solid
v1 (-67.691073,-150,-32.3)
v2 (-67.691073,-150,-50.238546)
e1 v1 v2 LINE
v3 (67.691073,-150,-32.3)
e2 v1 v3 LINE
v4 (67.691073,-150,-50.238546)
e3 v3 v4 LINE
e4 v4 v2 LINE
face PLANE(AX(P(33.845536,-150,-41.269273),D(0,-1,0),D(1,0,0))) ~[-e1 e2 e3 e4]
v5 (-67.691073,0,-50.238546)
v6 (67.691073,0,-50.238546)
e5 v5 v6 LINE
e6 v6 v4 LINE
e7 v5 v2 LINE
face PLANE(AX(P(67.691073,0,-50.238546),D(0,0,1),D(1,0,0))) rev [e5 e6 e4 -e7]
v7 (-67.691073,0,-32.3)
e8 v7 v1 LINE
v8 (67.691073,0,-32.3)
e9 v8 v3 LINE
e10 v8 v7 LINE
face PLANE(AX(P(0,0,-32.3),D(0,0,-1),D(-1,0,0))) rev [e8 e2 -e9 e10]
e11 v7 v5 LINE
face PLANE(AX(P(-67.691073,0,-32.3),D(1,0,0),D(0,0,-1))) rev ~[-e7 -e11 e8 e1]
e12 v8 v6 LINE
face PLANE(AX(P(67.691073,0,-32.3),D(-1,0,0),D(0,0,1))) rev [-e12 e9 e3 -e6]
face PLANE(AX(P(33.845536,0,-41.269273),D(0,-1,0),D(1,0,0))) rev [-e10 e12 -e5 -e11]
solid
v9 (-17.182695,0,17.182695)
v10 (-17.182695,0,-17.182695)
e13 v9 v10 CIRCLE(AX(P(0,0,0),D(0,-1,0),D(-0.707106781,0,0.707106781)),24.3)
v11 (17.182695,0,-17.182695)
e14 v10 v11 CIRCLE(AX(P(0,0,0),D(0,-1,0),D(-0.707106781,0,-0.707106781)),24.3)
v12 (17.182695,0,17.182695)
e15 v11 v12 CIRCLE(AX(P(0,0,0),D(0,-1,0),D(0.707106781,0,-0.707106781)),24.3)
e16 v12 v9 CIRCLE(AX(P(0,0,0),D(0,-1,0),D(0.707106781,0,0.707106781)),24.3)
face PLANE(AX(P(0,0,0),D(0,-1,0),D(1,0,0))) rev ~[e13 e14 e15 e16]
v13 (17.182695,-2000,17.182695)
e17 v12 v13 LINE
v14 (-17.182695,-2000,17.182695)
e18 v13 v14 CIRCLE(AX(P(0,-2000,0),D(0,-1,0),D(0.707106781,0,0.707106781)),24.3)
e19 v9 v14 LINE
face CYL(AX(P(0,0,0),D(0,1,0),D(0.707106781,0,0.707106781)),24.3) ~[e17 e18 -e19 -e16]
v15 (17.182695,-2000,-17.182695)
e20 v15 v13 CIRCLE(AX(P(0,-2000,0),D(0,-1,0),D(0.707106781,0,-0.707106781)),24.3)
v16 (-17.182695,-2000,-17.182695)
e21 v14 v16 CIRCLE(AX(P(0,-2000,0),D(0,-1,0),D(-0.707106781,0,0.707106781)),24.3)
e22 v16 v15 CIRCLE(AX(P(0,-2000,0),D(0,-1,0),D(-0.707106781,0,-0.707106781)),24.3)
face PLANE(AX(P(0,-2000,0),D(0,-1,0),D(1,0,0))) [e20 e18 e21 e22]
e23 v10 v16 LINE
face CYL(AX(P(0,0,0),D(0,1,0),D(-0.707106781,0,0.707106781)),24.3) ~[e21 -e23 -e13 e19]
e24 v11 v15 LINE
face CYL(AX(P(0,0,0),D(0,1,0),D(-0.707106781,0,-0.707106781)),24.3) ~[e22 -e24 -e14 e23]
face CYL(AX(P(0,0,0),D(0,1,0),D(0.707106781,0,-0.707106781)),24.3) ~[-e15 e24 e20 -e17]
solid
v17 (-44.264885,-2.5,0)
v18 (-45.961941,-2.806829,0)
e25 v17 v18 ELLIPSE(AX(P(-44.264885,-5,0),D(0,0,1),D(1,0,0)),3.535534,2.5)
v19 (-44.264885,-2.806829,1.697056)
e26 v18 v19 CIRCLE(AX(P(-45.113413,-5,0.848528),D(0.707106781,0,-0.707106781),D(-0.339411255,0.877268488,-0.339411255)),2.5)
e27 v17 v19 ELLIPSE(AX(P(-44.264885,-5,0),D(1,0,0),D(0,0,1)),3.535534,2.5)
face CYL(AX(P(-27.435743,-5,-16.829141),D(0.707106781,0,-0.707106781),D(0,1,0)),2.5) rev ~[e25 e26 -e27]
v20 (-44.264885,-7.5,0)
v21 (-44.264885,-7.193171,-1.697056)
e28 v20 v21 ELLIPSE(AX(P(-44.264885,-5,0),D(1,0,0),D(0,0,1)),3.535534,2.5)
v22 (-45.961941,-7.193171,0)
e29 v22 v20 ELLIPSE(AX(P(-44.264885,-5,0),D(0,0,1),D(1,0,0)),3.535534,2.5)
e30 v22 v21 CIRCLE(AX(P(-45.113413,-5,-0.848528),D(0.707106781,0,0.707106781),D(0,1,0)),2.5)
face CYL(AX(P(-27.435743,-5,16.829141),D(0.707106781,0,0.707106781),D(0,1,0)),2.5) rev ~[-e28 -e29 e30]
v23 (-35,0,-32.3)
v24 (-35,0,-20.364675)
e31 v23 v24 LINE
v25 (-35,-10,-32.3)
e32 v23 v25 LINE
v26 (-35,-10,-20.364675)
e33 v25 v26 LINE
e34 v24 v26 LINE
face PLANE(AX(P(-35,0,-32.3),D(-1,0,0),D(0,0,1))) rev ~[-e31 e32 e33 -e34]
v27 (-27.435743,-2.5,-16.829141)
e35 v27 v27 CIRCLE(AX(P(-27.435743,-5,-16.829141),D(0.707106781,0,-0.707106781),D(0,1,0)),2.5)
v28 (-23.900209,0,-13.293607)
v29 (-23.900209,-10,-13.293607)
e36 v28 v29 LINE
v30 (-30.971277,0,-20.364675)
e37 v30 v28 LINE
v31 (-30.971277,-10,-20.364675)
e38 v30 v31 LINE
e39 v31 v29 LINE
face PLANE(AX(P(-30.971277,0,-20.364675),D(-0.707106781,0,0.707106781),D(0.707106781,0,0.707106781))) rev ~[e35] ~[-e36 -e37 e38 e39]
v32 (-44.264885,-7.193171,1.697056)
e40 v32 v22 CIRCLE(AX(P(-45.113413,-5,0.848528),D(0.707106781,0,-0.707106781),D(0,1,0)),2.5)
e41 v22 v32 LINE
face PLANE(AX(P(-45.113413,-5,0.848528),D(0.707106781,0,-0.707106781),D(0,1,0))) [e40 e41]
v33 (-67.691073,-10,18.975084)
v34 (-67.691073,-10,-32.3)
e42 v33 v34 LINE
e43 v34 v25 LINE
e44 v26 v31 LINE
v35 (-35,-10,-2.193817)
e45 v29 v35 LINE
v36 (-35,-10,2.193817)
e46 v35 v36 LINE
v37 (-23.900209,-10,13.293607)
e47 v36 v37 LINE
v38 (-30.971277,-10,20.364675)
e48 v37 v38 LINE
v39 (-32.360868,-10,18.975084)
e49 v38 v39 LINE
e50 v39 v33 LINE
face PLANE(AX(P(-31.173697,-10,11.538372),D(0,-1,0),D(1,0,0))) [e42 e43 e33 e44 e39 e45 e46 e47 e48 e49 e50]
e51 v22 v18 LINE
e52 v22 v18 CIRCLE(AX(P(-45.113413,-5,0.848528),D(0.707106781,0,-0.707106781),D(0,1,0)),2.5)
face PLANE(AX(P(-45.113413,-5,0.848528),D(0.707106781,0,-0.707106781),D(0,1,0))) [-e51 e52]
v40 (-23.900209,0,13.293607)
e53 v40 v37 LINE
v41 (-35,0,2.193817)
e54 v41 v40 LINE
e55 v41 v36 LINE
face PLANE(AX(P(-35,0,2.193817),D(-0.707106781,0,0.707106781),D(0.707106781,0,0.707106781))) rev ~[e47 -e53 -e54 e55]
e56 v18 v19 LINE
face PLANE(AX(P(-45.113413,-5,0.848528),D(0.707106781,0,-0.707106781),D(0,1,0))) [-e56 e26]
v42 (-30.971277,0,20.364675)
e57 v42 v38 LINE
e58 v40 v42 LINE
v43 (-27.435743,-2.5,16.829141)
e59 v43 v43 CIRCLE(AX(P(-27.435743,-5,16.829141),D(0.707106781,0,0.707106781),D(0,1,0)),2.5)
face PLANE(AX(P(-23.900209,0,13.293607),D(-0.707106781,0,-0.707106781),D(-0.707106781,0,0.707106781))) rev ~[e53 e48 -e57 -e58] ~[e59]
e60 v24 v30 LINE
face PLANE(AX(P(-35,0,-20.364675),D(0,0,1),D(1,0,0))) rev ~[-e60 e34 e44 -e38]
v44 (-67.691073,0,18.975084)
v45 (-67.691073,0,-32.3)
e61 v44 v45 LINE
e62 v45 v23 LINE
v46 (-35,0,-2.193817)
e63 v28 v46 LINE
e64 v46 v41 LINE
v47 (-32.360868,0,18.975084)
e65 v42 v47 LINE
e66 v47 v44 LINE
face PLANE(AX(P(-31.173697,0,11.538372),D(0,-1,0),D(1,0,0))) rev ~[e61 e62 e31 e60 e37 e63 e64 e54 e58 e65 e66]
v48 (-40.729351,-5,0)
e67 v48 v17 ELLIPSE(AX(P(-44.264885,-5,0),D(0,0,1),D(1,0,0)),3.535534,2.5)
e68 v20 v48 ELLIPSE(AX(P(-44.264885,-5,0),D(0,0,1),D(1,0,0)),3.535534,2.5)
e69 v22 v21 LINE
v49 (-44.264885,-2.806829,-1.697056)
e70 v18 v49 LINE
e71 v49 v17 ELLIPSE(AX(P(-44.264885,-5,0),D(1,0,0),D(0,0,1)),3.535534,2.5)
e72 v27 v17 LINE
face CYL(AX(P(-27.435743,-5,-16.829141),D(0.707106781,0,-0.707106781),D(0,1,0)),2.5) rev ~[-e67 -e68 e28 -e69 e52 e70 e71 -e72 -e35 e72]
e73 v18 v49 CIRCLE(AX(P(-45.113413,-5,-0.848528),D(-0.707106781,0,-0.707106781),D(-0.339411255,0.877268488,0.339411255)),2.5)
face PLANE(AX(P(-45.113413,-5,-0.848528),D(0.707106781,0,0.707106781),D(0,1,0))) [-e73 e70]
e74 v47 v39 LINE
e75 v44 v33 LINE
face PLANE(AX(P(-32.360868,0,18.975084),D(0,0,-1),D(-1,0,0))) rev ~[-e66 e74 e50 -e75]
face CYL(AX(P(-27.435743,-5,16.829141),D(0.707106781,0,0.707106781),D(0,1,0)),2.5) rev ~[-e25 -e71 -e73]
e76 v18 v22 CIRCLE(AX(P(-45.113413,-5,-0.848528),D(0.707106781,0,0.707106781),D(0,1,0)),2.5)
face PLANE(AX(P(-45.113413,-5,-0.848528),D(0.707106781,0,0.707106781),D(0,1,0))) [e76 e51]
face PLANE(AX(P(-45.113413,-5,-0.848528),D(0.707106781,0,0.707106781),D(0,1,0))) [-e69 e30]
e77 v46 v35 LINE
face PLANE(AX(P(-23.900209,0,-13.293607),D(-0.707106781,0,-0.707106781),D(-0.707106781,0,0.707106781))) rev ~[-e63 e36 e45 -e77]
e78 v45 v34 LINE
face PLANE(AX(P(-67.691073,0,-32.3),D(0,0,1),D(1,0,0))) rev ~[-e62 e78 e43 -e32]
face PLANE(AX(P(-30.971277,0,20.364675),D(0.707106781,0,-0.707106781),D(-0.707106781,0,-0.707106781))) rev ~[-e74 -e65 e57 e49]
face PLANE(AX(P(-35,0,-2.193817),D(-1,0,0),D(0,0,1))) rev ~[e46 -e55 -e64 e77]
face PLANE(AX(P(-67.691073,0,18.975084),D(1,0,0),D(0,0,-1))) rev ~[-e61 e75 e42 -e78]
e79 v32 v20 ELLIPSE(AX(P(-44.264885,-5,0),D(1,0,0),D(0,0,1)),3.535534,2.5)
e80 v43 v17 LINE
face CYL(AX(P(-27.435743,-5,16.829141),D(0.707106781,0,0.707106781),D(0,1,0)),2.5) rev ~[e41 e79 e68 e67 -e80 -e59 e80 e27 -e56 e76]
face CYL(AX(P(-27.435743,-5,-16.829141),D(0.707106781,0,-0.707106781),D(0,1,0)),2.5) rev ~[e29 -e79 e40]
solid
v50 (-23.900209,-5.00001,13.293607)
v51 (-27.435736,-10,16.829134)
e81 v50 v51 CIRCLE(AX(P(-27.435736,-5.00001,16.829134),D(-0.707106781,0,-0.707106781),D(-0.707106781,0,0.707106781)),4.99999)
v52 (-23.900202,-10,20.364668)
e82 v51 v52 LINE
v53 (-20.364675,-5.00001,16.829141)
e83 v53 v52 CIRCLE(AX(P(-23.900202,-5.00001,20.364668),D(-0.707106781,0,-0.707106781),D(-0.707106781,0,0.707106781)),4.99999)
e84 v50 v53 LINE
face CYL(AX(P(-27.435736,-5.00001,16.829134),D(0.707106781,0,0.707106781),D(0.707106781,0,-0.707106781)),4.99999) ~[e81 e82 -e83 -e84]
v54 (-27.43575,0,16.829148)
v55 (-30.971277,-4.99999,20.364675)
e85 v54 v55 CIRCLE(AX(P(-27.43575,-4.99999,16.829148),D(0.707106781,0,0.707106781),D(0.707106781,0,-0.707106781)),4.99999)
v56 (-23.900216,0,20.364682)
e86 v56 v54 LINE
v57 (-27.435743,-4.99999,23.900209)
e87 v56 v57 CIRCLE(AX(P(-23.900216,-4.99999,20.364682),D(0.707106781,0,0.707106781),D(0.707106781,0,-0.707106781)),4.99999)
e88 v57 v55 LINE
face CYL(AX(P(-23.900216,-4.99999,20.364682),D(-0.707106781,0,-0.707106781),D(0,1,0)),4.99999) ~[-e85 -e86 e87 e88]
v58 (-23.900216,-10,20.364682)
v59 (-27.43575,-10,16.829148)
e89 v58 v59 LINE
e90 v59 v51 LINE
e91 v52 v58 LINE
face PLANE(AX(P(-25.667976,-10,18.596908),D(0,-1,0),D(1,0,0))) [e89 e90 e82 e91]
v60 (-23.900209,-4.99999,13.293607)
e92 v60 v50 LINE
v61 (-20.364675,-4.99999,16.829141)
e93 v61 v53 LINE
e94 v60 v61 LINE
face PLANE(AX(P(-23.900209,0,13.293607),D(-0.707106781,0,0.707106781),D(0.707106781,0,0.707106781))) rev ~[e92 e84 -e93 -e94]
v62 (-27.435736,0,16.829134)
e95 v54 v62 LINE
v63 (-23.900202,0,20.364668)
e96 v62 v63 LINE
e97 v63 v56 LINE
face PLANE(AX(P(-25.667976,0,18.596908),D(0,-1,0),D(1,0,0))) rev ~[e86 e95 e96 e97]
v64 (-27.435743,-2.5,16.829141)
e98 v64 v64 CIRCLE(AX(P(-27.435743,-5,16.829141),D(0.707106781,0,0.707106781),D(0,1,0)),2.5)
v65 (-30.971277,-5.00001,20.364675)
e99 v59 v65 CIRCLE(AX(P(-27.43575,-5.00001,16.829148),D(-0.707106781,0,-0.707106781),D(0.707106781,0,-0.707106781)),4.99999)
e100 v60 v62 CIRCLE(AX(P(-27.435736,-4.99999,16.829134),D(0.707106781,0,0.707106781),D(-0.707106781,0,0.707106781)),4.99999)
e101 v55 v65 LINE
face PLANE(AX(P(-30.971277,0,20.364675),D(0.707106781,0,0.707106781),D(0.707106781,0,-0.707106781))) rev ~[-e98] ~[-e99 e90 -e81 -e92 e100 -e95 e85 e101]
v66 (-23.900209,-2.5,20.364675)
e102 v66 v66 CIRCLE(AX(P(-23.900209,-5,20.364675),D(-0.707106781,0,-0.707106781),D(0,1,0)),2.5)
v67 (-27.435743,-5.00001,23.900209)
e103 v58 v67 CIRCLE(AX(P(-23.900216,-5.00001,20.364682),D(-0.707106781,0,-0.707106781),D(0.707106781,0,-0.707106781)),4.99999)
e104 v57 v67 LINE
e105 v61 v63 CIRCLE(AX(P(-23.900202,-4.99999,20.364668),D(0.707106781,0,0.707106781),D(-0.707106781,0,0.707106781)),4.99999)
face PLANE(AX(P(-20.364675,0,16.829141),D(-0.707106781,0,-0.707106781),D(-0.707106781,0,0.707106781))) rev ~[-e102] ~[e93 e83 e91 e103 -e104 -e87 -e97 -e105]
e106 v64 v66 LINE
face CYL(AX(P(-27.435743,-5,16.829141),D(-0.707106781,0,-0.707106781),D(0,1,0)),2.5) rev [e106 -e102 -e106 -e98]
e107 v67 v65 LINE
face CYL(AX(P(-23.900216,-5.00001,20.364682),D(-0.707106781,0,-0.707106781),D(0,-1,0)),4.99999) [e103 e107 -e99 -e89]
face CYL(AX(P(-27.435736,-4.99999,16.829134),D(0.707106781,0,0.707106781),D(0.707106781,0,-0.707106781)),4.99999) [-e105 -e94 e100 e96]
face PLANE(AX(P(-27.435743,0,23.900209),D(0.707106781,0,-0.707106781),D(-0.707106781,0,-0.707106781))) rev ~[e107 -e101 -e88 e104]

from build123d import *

# Parameters (mm, degrees)
F1_DEPTH  = 2000
F2_DEPTH  = 10
F3_R      = 2.5
F4_DEPTH  = 25
F5_R      = 2.5
F6_DEPTH  = 25
F7_DEPTH  = 150
F9_DEPTH  = 10
F10_DEPTH = 25
F11_R     = 4.99999


# Not quite as in the source:
# - a fillet or chamfer is up to 0.001 mm smaller than in the source, because OpenCascade refuses the exact size


with BuildPart() as f1:
    # F0 (on Front) → F1 (new body)
    with BuildSketch(Plane.XZ):
        with BuildLine():
            ThreePointArc((17.1826947828, -17.1826947828), (22.45027264, -9.2992074065), (24.3, 0))
            ThreePointArc((24.3, 0), (22.45027264, 9.2992074065), (17.1826947828, 17.1826947828))
            ThreePointArc((17.1826947828, 17.1826947828), (0, 24.3), (-17.1826947828, 17.1826947828))
            ThreePointArc((-17.1826947828, 17.1826947828), (-24.3, 0), (-17.1826947828, -17.1826947828))
            ThreePointArc((-17.1826947828, -17.1826947828), (0, -24.3), (17.1826947828, -17.1826947828))
        make_face()
    extrude(amount=F1_DEPTH)


with BuildPart() as f2:
    # F0 (on Front) → F2 (new body)
    with BuildSketch(Plane.XZ):
        Polygon((-35, 2.1938166904), (-23.9002092041, 13.2936074863), (-30.971277016, 20.3646752982), (-32.360868023, 18.9750842911), (-35, 16.3359523141), align=None)
        Polygon((-35, 16.3359523141), (-32.360868023, 18.9750842911), (-35, 18.9750842911), align=None)
        Polygon((-35, -2.1938166904), (-35, 2.1938166904), (-35, 16.3359523141), (-35, 18.9750842911), (-67.6910728216, 18.9750842911), (-67.6910728216, -32.3), (-35, -32.3), (-35, -20.3646752982), (-35, -16.3359523141), align=None)
        Polygon((-23.9002092041, -13.2936074863), (-35, -2.1938166904), (-35, -16.3359523141), (-30.971277016, -20.3646752982), align=None)
        Polygon((-30.971277016, -20.3646752982), (-35, -16.3359523141), (-35, -20.3646752982), align=None)
    extrude(amount=F2_DEPTH)

    # F3 (on face) → F4 (cut)
    with BuildSketch(Plane(origin=(-5.3033008589, 0, -5.3033008589), x_dir=(0, 1, 0), z_dir=(0.7071067812, 0, 0.7071067812))):
        with Locations((-5, 31.3)):
            Circle(F3_R)
    extrude(amount=-F4_DEPTH, mode=Mode.SUBTRACT)

    # F5 (on face) → F6 (cut)
    with BuildSketch(Plane(origin=(-5.3033008589, 0, 5.3033008589), x_dir=(0, 1, 0), z_dir=(0.7071067812, 0, -0.7071067812))):
        with Locations((-5, -31.3)):
            Circle(F5_R)
    extrude(amount=-F6_DEPTH, mode=Mode.SUBTRACT)


with BuildPart() as f7:
    # F0 (on Front) → F7 (new body)
    with BuildSketch(Plane.XZ):
        Polygon((-35, -32.3), (-67.6910728216, -32.3), (-67.6910728216, -50.238545984), (0, -50.238545984), (0, -32.3), align=None)
    extrude(amount=F7_DEPTH)

    # F8: F7 across face


with BuildPart() as f7_1:
    add(f7.part)
    add(f7.part.mirror(Plane(origin=(0, -75, -41.269272992), x_dir=(0, 1, 0), z_dir=(1, 0, 0))))


with BuildPart() as f9:
    # F0 (on Front) → F9 (new body)
    with BuildSketch(Plane.XZ):
        Polygon((-23.9002092041, 13.2936074863), (-20.3646752982, 16.8291413922), (-27.43574311, 23.9002092041), (-30.971277016, 20.3646752982), align=None)
    extrude(amount=F9_DEPTH)

    # F3 (on face) → F10 (cut)
    with BuildSketch(Plane(origin=(-5.3033008589, 0, -5.3033008589), x_dir=(0, 1, 0), z_dir=(0.7071067812, 0, 0.7071067812))):
        with Locations((-5, 31.3)):
            Circle(F3_R)
    extrude(amount=F10_DEPTH, mode=Mode.SUBTRACT)

    # F11 (radius 5 in the source; OpenCascade refuses exactly that, so slightly less here)
    f11_edges = [f9.edges().sort_by_distance(p)[0] for p in [
        (-29.20351, 0, 22.132442),
        (-29.20351, -10, 22.132442),
        (-22.132442, -10, 15.061374),
        (-22.132442, 0, 15.061374),
    ]]
    fillet(f11_edges, radius=F11_R)


solid = Compound([f1.part, f2.part, f7_1.part, f9.part])
